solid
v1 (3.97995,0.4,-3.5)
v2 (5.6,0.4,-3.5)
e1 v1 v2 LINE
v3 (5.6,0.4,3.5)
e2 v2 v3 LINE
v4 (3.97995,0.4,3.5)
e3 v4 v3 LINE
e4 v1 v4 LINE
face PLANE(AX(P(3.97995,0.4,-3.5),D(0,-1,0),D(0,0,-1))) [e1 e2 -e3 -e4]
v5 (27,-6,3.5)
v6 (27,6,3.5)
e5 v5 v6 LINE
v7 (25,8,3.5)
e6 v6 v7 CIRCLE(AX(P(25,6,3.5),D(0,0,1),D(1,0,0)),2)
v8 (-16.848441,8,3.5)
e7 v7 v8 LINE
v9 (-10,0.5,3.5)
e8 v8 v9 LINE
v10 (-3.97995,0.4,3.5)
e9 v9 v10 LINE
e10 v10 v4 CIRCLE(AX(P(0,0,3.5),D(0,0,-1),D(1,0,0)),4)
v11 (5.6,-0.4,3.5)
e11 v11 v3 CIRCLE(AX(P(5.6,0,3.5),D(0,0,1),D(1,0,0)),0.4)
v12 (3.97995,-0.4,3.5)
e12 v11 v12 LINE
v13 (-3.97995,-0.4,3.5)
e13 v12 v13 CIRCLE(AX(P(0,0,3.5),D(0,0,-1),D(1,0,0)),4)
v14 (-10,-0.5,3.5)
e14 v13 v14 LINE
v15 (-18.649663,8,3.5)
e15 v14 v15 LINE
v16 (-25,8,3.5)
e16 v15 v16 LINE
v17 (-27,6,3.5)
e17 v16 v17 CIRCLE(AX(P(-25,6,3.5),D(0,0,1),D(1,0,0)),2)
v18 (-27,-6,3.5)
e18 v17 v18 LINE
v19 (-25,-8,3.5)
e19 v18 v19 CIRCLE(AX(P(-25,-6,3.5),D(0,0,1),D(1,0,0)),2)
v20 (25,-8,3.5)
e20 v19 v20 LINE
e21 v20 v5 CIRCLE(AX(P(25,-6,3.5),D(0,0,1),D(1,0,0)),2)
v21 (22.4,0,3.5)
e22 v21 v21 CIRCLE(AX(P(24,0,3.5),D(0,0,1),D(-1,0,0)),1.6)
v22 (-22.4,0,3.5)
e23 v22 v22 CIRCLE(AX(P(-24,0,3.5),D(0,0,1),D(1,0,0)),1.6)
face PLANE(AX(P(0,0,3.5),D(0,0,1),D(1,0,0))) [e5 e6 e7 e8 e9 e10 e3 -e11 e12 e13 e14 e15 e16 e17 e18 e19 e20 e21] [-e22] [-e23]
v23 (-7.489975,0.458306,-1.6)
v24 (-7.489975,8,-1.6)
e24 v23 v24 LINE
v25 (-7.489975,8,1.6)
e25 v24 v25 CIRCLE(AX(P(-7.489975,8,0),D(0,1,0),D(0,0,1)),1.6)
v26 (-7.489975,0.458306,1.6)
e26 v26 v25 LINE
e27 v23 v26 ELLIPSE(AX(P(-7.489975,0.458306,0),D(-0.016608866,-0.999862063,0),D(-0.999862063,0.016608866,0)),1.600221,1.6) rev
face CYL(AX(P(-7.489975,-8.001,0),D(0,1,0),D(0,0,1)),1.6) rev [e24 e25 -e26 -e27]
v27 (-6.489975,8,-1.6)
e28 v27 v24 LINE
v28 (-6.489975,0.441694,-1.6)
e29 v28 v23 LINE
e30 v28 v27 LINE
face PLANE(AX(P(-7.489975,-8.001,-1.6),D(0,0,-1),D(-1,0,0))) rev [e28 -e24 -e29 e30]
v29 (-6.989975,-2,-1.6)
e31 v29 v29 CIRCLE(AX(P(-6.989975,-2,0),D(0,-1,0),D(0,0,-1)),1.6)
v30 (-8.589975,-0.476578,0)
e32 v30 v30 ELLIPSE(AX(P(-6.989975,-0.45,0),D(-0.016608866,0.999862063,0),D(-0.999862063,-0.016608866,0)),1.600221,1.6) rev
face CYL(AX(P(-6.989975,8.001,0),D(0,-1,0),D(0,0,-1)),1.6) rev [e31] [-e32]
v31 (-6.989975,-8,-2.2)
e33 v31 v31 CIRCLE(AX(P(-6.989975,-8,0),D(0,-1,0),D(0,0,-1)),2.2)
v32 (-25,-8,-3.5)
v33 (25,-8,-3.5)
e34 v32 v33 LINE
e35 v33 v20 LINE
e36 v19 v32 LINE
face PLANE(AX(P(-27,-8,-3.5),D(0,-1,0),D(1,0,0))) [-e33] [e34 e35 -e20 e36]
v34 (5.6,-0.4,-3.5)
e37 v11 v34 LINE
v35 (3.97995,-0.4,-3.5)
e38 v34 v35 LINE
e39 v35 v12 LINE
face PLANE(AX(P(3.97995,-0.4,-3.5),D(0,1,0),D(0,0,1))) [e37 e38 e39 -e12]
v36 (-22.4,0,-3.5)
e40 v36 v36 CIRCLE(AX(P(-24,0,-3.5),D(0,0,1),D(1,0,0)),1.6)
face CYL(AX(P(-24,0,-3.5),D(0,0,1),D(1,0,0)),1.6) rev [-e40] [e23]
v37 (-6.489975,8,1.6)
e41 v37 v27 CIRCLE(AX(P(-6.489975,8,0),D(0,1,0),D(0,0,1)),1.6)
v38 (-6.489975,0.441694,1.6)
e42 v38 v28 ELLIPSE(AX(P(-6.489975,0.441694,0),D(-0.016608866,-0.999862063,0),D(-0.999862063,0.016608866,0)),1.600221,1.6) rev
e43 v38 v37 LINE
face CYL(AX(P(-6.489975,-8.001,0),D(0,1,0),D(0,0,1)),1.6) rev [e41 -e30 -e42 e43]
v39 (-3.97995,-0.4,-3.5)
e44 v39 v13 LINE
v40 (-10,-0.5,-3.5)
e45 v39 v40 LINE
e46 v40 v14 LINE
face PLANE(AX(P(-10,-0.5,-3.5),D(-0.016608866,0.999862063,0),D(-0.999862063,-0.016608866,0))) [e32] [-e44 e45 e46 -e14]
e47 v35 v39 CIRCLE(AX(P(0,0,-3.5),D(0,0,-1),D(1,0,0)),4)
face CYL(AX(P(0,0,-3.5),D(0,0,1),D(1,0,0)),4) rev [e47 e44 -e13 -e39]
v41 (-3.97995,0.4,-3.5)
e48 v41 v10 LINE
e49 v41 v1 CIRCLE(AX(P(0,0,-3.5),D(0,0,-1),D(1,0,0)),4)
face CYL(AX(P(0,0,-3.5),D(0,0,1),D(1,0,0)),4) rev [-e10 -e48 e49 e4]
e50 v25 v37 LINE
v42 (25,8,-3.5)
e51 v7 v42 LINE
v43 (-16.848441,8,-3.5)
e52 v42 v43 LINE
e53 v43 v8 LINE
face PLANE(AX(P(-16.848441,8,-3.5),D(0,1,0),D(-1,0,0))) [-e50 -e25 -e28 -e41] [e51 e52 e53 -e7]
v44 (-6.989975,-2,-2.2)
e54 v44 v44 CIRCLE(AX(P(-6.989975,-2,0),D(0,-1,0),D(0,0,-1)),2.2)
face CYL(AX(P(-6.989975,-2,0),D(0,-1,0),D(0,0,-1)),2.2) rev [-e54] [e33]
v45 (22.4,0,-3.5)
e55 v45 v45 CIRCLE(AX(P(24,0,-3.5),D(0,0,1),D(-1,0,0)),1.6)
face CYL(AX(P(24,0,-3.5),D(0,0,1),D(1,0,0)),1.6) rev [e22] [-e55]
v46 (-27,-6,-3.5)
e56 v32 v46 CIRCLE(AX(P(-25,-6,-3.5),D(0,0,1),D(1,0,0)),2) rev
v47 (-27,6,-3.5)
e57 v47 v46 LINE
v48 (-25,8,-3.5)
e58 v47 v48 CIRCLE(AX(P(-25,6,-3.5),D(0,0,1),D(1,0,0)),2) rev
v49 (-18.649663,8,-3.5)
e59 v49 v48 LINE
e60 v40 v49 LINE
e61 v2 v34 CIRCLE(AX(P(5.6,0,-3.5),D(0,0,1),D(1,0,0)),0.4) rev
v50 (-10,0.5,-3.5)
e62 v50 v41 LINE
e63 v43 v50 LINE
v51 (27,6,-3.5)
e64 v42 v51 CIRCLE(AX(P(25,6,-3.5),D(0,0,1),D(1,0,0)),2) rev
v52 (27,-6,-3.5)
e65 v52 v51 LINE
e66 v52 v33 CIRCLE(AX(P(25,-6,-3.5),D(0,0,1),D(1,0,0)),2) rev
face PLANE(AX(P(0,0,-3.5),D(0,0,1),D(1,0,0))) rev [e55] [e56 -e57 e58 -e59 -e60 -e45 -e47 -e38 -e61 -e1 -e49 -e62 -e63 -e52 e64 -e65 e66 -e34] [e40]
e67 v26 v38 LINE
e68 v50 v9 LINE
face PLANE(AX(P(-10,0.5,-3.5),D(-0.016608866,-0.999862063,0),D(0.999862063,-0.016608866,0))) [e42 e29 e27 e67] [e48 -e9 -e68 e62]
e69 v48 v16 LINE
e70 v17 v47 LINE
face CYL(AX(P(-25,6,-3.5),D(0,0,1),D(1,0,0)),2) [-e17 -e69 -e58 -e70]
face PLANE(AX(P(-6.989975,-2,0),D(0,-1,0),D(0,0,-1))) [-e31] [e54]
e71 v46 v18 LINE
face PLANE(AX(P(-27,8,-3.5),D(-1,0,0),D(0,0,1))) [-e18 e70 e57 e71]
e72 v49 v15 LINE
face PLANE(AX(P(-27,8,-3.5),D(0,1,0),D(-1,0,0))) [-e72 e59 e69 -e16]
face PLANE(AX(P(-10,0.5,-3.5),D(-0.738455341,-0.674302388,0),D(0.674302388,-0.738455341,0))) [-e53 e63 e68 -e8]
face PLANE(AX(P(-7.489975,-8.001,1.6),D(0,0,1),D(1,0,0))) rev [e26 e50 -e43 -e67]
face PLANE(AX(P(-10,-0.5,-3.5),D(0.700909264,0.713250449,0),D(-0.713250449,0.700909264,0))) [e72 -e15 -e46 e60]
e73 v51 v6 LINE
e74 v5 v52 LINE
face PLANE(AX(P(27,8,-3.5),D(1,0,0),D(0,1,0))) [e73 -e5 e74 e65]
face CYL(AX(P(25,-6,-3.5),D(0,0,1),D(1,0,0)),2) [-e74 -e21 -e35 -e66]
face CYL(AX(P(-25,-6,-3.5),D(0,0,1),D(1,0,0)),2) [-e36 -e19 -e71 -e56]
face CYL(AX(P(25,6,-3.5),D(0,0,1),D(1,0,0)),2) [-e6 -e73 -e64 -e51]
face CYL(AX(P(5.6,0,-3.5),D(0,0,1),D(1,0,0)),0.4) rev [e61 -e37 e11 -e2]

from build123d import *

# Parameters (mm, degrees)
BOSS_EXTRUDE1_DEPTH      = 3.5
BOSS_EXTRUDE1_DEPTH_BACK = 3.5
SKETCH1_R                = 1.6
CUT_EXTRUDE1_REACH       = 33.579
SKETCH3_R                = 1.6
SKETCH3_3_R              = 2.2
SKETCH3_3_R_2            = 1.6
CUT_EXTRUDE2_DEPTH       = 6
CUT_EXTRUDE3_REACH       = 33.579
FILLET1_R                = 2
FILLET2_R                = 0.4


with BuildPart() as part:
    # Sketch1 → Boss-Extrude1 (new, two sides: drawn at the far end of the back side and taken through both)
    with BuildSketch(Plane.XY.offset(-BOSS_EXTRUDE1_DEPTH_BACK)):
        with BuildLine():
            Line((-27, 8), (-18.64966284, 8))
            Line((-18.64966284, 8), (-10, -0.5))
            Line((-10, -0.5), (-3.979949748, -0.4))
            ThreePointArc((-3.979949748, -0.4), (0, -4), (3.979949748, -0.4))
            Line((3.979949748, -0.4), (6, -0.4))
            Line((6, -0.4), (6, 0.4))
            Line((6, 0.4), (3.979949748, 0.4))
            ThreePointArc((3.979949748, 0.4), (0, 4), (-3.979949748, 0.4))
            Line((-3.979949748, 0.4), (-10, 0.5))
            Line((-10, 0.5), (-16.848441102, 8))
            Line((-16.848441102, 8), (27, 8))
            Line((27, 8), (27, -8))
            Line((27, -8), (-27, -8))
            Line((-27, -8), (-27, 8))
        make_face()
        with Locations((-24, 0)):
            Circle(SKETCH1_R, mode=Mode.SUBTRACT)
        with Locations(Location((24, 0, 0), (0, 0, 180))):
            Circle(SKETCH1_R, mode=Mode.SUBTRACT)
    extrude(amount=BOSS_EXTRUDE1_DEPTH + BOSS_EXTRUDE1_DEPTH_BACK)

    # Cut-Extrude1: up to this plane
    cut_extrude1_end = Plane(origin=(-10, -0.5, -3.5), z_dir=(-0.016608865731892127, 0.9998620632762801, 0))
    # Sketch3 → Cut-Extrude1 (cut, up to the surface)
    with BuildSketch(Plane.XZ.offset(8), mode=Mode.PRIVATE) as cut_extrude1_sk1:
        with Locations(Location((-6.989974874, 0, 0), (0, 0, 270))):
            Circle(SKETCH3_R)
    cut_extrude1_tool1 = split(extrude(cut_extrude1_sk1.sketch, amount=-CUT_EXTRUDE1_REACH, mode=Mode.PRIVATE), bisect_by=cut_extrude1_end, keep=Keep.BOTH, mode=Mode.PRIVATE)
    add(cut_extrude1_tool1.solids().sort_by_distance((-6.989975, -8, 0))[0], mode=Mode.SUBTRACT)

    # Sketch3<3> → Cut-Extrude2 (cut)
    with BuildSketch(Plane.XZ.offset(8)):
        with Locations(Location((-6.989974874, 0, 0), (0, 0, 270))):
            Circle(SKETCH3_3_R)
        with Locations(Location((-6.989974874, 0, 0), (0, 0, 270))):
            Circle(SKETCH3_3_R_2, mode=Mode.SUBTRACT)
    extrude(amount=-CUT_EXTRUDE2_DEPTH, mode=Mode.SUBTRACT)

    # Cut-Extrude3: up to this plane
    cut_extrude3_end = Plane(origin=(-10, 0.5, -3.5), z_dir=(-0.016608865731892127, -0.9998620632762801, 0))
    # Sketch4 → Cut-Extrude3 (cut, up to the surface)
    with BuildSketch(Plane(origin=(0, 8, 0), x_dir=(1, 0, 0), z_dir=(0, 1, 0)), mode=Mode.PRIVATE) as cut_extrude3_sk1:
        with BuildLine():
            Line((-7.489974874, 1.6), (-6.489974874, 1.6))
            ThreePointArc((-6.489974874, 1.6), (-4.889974874, 0), (-6.489974874, -1.6))
            Line((-6.489974874, -1.6), (-7.489974874, -1.6))
            ThreePointArc((-7.489974874, -1.6), (-9.089974874, 0), (-7.489974874, 1.6))
        make_face()
    cut_extrude3_tool1 = split(extrude(cut_extrude3_sk1.sketch, amount=-CUT_EXTRUDE3_REACH, mode=Mode.PRIVATE), bisect_by=cut_extrude3_end, keep=Keep.BOTH, mode=Mode.PRIVATE)
    add(cut_extrude3_tool1.solids().sort_by_distance((-6.989975, 8, 0))[0], mode=Mode.SUBTRACT)

    # Fillet1
    fillet1_edges = [part.edges().sort_by_distance(p)[0] for p in [
        (27, 8, 0),
        (27, -8, 0),
        (-27, -8, 0),
        (-27, 8, 0),
    ]]
    fillet(fillet1_edges, radius=FILLET1_R)

    # Fillet2
    fillet2_edges = [part.edges().sort_by_distance(p)[0] for p in [
        (6, -0.4, 0),
        (6, 0.4, 0),
    ]]
    fillet(fillet2_edges, radius=FILLET2_R - 0.0001)  # a hair under: the kernel refuses the full size


solid = part.part
